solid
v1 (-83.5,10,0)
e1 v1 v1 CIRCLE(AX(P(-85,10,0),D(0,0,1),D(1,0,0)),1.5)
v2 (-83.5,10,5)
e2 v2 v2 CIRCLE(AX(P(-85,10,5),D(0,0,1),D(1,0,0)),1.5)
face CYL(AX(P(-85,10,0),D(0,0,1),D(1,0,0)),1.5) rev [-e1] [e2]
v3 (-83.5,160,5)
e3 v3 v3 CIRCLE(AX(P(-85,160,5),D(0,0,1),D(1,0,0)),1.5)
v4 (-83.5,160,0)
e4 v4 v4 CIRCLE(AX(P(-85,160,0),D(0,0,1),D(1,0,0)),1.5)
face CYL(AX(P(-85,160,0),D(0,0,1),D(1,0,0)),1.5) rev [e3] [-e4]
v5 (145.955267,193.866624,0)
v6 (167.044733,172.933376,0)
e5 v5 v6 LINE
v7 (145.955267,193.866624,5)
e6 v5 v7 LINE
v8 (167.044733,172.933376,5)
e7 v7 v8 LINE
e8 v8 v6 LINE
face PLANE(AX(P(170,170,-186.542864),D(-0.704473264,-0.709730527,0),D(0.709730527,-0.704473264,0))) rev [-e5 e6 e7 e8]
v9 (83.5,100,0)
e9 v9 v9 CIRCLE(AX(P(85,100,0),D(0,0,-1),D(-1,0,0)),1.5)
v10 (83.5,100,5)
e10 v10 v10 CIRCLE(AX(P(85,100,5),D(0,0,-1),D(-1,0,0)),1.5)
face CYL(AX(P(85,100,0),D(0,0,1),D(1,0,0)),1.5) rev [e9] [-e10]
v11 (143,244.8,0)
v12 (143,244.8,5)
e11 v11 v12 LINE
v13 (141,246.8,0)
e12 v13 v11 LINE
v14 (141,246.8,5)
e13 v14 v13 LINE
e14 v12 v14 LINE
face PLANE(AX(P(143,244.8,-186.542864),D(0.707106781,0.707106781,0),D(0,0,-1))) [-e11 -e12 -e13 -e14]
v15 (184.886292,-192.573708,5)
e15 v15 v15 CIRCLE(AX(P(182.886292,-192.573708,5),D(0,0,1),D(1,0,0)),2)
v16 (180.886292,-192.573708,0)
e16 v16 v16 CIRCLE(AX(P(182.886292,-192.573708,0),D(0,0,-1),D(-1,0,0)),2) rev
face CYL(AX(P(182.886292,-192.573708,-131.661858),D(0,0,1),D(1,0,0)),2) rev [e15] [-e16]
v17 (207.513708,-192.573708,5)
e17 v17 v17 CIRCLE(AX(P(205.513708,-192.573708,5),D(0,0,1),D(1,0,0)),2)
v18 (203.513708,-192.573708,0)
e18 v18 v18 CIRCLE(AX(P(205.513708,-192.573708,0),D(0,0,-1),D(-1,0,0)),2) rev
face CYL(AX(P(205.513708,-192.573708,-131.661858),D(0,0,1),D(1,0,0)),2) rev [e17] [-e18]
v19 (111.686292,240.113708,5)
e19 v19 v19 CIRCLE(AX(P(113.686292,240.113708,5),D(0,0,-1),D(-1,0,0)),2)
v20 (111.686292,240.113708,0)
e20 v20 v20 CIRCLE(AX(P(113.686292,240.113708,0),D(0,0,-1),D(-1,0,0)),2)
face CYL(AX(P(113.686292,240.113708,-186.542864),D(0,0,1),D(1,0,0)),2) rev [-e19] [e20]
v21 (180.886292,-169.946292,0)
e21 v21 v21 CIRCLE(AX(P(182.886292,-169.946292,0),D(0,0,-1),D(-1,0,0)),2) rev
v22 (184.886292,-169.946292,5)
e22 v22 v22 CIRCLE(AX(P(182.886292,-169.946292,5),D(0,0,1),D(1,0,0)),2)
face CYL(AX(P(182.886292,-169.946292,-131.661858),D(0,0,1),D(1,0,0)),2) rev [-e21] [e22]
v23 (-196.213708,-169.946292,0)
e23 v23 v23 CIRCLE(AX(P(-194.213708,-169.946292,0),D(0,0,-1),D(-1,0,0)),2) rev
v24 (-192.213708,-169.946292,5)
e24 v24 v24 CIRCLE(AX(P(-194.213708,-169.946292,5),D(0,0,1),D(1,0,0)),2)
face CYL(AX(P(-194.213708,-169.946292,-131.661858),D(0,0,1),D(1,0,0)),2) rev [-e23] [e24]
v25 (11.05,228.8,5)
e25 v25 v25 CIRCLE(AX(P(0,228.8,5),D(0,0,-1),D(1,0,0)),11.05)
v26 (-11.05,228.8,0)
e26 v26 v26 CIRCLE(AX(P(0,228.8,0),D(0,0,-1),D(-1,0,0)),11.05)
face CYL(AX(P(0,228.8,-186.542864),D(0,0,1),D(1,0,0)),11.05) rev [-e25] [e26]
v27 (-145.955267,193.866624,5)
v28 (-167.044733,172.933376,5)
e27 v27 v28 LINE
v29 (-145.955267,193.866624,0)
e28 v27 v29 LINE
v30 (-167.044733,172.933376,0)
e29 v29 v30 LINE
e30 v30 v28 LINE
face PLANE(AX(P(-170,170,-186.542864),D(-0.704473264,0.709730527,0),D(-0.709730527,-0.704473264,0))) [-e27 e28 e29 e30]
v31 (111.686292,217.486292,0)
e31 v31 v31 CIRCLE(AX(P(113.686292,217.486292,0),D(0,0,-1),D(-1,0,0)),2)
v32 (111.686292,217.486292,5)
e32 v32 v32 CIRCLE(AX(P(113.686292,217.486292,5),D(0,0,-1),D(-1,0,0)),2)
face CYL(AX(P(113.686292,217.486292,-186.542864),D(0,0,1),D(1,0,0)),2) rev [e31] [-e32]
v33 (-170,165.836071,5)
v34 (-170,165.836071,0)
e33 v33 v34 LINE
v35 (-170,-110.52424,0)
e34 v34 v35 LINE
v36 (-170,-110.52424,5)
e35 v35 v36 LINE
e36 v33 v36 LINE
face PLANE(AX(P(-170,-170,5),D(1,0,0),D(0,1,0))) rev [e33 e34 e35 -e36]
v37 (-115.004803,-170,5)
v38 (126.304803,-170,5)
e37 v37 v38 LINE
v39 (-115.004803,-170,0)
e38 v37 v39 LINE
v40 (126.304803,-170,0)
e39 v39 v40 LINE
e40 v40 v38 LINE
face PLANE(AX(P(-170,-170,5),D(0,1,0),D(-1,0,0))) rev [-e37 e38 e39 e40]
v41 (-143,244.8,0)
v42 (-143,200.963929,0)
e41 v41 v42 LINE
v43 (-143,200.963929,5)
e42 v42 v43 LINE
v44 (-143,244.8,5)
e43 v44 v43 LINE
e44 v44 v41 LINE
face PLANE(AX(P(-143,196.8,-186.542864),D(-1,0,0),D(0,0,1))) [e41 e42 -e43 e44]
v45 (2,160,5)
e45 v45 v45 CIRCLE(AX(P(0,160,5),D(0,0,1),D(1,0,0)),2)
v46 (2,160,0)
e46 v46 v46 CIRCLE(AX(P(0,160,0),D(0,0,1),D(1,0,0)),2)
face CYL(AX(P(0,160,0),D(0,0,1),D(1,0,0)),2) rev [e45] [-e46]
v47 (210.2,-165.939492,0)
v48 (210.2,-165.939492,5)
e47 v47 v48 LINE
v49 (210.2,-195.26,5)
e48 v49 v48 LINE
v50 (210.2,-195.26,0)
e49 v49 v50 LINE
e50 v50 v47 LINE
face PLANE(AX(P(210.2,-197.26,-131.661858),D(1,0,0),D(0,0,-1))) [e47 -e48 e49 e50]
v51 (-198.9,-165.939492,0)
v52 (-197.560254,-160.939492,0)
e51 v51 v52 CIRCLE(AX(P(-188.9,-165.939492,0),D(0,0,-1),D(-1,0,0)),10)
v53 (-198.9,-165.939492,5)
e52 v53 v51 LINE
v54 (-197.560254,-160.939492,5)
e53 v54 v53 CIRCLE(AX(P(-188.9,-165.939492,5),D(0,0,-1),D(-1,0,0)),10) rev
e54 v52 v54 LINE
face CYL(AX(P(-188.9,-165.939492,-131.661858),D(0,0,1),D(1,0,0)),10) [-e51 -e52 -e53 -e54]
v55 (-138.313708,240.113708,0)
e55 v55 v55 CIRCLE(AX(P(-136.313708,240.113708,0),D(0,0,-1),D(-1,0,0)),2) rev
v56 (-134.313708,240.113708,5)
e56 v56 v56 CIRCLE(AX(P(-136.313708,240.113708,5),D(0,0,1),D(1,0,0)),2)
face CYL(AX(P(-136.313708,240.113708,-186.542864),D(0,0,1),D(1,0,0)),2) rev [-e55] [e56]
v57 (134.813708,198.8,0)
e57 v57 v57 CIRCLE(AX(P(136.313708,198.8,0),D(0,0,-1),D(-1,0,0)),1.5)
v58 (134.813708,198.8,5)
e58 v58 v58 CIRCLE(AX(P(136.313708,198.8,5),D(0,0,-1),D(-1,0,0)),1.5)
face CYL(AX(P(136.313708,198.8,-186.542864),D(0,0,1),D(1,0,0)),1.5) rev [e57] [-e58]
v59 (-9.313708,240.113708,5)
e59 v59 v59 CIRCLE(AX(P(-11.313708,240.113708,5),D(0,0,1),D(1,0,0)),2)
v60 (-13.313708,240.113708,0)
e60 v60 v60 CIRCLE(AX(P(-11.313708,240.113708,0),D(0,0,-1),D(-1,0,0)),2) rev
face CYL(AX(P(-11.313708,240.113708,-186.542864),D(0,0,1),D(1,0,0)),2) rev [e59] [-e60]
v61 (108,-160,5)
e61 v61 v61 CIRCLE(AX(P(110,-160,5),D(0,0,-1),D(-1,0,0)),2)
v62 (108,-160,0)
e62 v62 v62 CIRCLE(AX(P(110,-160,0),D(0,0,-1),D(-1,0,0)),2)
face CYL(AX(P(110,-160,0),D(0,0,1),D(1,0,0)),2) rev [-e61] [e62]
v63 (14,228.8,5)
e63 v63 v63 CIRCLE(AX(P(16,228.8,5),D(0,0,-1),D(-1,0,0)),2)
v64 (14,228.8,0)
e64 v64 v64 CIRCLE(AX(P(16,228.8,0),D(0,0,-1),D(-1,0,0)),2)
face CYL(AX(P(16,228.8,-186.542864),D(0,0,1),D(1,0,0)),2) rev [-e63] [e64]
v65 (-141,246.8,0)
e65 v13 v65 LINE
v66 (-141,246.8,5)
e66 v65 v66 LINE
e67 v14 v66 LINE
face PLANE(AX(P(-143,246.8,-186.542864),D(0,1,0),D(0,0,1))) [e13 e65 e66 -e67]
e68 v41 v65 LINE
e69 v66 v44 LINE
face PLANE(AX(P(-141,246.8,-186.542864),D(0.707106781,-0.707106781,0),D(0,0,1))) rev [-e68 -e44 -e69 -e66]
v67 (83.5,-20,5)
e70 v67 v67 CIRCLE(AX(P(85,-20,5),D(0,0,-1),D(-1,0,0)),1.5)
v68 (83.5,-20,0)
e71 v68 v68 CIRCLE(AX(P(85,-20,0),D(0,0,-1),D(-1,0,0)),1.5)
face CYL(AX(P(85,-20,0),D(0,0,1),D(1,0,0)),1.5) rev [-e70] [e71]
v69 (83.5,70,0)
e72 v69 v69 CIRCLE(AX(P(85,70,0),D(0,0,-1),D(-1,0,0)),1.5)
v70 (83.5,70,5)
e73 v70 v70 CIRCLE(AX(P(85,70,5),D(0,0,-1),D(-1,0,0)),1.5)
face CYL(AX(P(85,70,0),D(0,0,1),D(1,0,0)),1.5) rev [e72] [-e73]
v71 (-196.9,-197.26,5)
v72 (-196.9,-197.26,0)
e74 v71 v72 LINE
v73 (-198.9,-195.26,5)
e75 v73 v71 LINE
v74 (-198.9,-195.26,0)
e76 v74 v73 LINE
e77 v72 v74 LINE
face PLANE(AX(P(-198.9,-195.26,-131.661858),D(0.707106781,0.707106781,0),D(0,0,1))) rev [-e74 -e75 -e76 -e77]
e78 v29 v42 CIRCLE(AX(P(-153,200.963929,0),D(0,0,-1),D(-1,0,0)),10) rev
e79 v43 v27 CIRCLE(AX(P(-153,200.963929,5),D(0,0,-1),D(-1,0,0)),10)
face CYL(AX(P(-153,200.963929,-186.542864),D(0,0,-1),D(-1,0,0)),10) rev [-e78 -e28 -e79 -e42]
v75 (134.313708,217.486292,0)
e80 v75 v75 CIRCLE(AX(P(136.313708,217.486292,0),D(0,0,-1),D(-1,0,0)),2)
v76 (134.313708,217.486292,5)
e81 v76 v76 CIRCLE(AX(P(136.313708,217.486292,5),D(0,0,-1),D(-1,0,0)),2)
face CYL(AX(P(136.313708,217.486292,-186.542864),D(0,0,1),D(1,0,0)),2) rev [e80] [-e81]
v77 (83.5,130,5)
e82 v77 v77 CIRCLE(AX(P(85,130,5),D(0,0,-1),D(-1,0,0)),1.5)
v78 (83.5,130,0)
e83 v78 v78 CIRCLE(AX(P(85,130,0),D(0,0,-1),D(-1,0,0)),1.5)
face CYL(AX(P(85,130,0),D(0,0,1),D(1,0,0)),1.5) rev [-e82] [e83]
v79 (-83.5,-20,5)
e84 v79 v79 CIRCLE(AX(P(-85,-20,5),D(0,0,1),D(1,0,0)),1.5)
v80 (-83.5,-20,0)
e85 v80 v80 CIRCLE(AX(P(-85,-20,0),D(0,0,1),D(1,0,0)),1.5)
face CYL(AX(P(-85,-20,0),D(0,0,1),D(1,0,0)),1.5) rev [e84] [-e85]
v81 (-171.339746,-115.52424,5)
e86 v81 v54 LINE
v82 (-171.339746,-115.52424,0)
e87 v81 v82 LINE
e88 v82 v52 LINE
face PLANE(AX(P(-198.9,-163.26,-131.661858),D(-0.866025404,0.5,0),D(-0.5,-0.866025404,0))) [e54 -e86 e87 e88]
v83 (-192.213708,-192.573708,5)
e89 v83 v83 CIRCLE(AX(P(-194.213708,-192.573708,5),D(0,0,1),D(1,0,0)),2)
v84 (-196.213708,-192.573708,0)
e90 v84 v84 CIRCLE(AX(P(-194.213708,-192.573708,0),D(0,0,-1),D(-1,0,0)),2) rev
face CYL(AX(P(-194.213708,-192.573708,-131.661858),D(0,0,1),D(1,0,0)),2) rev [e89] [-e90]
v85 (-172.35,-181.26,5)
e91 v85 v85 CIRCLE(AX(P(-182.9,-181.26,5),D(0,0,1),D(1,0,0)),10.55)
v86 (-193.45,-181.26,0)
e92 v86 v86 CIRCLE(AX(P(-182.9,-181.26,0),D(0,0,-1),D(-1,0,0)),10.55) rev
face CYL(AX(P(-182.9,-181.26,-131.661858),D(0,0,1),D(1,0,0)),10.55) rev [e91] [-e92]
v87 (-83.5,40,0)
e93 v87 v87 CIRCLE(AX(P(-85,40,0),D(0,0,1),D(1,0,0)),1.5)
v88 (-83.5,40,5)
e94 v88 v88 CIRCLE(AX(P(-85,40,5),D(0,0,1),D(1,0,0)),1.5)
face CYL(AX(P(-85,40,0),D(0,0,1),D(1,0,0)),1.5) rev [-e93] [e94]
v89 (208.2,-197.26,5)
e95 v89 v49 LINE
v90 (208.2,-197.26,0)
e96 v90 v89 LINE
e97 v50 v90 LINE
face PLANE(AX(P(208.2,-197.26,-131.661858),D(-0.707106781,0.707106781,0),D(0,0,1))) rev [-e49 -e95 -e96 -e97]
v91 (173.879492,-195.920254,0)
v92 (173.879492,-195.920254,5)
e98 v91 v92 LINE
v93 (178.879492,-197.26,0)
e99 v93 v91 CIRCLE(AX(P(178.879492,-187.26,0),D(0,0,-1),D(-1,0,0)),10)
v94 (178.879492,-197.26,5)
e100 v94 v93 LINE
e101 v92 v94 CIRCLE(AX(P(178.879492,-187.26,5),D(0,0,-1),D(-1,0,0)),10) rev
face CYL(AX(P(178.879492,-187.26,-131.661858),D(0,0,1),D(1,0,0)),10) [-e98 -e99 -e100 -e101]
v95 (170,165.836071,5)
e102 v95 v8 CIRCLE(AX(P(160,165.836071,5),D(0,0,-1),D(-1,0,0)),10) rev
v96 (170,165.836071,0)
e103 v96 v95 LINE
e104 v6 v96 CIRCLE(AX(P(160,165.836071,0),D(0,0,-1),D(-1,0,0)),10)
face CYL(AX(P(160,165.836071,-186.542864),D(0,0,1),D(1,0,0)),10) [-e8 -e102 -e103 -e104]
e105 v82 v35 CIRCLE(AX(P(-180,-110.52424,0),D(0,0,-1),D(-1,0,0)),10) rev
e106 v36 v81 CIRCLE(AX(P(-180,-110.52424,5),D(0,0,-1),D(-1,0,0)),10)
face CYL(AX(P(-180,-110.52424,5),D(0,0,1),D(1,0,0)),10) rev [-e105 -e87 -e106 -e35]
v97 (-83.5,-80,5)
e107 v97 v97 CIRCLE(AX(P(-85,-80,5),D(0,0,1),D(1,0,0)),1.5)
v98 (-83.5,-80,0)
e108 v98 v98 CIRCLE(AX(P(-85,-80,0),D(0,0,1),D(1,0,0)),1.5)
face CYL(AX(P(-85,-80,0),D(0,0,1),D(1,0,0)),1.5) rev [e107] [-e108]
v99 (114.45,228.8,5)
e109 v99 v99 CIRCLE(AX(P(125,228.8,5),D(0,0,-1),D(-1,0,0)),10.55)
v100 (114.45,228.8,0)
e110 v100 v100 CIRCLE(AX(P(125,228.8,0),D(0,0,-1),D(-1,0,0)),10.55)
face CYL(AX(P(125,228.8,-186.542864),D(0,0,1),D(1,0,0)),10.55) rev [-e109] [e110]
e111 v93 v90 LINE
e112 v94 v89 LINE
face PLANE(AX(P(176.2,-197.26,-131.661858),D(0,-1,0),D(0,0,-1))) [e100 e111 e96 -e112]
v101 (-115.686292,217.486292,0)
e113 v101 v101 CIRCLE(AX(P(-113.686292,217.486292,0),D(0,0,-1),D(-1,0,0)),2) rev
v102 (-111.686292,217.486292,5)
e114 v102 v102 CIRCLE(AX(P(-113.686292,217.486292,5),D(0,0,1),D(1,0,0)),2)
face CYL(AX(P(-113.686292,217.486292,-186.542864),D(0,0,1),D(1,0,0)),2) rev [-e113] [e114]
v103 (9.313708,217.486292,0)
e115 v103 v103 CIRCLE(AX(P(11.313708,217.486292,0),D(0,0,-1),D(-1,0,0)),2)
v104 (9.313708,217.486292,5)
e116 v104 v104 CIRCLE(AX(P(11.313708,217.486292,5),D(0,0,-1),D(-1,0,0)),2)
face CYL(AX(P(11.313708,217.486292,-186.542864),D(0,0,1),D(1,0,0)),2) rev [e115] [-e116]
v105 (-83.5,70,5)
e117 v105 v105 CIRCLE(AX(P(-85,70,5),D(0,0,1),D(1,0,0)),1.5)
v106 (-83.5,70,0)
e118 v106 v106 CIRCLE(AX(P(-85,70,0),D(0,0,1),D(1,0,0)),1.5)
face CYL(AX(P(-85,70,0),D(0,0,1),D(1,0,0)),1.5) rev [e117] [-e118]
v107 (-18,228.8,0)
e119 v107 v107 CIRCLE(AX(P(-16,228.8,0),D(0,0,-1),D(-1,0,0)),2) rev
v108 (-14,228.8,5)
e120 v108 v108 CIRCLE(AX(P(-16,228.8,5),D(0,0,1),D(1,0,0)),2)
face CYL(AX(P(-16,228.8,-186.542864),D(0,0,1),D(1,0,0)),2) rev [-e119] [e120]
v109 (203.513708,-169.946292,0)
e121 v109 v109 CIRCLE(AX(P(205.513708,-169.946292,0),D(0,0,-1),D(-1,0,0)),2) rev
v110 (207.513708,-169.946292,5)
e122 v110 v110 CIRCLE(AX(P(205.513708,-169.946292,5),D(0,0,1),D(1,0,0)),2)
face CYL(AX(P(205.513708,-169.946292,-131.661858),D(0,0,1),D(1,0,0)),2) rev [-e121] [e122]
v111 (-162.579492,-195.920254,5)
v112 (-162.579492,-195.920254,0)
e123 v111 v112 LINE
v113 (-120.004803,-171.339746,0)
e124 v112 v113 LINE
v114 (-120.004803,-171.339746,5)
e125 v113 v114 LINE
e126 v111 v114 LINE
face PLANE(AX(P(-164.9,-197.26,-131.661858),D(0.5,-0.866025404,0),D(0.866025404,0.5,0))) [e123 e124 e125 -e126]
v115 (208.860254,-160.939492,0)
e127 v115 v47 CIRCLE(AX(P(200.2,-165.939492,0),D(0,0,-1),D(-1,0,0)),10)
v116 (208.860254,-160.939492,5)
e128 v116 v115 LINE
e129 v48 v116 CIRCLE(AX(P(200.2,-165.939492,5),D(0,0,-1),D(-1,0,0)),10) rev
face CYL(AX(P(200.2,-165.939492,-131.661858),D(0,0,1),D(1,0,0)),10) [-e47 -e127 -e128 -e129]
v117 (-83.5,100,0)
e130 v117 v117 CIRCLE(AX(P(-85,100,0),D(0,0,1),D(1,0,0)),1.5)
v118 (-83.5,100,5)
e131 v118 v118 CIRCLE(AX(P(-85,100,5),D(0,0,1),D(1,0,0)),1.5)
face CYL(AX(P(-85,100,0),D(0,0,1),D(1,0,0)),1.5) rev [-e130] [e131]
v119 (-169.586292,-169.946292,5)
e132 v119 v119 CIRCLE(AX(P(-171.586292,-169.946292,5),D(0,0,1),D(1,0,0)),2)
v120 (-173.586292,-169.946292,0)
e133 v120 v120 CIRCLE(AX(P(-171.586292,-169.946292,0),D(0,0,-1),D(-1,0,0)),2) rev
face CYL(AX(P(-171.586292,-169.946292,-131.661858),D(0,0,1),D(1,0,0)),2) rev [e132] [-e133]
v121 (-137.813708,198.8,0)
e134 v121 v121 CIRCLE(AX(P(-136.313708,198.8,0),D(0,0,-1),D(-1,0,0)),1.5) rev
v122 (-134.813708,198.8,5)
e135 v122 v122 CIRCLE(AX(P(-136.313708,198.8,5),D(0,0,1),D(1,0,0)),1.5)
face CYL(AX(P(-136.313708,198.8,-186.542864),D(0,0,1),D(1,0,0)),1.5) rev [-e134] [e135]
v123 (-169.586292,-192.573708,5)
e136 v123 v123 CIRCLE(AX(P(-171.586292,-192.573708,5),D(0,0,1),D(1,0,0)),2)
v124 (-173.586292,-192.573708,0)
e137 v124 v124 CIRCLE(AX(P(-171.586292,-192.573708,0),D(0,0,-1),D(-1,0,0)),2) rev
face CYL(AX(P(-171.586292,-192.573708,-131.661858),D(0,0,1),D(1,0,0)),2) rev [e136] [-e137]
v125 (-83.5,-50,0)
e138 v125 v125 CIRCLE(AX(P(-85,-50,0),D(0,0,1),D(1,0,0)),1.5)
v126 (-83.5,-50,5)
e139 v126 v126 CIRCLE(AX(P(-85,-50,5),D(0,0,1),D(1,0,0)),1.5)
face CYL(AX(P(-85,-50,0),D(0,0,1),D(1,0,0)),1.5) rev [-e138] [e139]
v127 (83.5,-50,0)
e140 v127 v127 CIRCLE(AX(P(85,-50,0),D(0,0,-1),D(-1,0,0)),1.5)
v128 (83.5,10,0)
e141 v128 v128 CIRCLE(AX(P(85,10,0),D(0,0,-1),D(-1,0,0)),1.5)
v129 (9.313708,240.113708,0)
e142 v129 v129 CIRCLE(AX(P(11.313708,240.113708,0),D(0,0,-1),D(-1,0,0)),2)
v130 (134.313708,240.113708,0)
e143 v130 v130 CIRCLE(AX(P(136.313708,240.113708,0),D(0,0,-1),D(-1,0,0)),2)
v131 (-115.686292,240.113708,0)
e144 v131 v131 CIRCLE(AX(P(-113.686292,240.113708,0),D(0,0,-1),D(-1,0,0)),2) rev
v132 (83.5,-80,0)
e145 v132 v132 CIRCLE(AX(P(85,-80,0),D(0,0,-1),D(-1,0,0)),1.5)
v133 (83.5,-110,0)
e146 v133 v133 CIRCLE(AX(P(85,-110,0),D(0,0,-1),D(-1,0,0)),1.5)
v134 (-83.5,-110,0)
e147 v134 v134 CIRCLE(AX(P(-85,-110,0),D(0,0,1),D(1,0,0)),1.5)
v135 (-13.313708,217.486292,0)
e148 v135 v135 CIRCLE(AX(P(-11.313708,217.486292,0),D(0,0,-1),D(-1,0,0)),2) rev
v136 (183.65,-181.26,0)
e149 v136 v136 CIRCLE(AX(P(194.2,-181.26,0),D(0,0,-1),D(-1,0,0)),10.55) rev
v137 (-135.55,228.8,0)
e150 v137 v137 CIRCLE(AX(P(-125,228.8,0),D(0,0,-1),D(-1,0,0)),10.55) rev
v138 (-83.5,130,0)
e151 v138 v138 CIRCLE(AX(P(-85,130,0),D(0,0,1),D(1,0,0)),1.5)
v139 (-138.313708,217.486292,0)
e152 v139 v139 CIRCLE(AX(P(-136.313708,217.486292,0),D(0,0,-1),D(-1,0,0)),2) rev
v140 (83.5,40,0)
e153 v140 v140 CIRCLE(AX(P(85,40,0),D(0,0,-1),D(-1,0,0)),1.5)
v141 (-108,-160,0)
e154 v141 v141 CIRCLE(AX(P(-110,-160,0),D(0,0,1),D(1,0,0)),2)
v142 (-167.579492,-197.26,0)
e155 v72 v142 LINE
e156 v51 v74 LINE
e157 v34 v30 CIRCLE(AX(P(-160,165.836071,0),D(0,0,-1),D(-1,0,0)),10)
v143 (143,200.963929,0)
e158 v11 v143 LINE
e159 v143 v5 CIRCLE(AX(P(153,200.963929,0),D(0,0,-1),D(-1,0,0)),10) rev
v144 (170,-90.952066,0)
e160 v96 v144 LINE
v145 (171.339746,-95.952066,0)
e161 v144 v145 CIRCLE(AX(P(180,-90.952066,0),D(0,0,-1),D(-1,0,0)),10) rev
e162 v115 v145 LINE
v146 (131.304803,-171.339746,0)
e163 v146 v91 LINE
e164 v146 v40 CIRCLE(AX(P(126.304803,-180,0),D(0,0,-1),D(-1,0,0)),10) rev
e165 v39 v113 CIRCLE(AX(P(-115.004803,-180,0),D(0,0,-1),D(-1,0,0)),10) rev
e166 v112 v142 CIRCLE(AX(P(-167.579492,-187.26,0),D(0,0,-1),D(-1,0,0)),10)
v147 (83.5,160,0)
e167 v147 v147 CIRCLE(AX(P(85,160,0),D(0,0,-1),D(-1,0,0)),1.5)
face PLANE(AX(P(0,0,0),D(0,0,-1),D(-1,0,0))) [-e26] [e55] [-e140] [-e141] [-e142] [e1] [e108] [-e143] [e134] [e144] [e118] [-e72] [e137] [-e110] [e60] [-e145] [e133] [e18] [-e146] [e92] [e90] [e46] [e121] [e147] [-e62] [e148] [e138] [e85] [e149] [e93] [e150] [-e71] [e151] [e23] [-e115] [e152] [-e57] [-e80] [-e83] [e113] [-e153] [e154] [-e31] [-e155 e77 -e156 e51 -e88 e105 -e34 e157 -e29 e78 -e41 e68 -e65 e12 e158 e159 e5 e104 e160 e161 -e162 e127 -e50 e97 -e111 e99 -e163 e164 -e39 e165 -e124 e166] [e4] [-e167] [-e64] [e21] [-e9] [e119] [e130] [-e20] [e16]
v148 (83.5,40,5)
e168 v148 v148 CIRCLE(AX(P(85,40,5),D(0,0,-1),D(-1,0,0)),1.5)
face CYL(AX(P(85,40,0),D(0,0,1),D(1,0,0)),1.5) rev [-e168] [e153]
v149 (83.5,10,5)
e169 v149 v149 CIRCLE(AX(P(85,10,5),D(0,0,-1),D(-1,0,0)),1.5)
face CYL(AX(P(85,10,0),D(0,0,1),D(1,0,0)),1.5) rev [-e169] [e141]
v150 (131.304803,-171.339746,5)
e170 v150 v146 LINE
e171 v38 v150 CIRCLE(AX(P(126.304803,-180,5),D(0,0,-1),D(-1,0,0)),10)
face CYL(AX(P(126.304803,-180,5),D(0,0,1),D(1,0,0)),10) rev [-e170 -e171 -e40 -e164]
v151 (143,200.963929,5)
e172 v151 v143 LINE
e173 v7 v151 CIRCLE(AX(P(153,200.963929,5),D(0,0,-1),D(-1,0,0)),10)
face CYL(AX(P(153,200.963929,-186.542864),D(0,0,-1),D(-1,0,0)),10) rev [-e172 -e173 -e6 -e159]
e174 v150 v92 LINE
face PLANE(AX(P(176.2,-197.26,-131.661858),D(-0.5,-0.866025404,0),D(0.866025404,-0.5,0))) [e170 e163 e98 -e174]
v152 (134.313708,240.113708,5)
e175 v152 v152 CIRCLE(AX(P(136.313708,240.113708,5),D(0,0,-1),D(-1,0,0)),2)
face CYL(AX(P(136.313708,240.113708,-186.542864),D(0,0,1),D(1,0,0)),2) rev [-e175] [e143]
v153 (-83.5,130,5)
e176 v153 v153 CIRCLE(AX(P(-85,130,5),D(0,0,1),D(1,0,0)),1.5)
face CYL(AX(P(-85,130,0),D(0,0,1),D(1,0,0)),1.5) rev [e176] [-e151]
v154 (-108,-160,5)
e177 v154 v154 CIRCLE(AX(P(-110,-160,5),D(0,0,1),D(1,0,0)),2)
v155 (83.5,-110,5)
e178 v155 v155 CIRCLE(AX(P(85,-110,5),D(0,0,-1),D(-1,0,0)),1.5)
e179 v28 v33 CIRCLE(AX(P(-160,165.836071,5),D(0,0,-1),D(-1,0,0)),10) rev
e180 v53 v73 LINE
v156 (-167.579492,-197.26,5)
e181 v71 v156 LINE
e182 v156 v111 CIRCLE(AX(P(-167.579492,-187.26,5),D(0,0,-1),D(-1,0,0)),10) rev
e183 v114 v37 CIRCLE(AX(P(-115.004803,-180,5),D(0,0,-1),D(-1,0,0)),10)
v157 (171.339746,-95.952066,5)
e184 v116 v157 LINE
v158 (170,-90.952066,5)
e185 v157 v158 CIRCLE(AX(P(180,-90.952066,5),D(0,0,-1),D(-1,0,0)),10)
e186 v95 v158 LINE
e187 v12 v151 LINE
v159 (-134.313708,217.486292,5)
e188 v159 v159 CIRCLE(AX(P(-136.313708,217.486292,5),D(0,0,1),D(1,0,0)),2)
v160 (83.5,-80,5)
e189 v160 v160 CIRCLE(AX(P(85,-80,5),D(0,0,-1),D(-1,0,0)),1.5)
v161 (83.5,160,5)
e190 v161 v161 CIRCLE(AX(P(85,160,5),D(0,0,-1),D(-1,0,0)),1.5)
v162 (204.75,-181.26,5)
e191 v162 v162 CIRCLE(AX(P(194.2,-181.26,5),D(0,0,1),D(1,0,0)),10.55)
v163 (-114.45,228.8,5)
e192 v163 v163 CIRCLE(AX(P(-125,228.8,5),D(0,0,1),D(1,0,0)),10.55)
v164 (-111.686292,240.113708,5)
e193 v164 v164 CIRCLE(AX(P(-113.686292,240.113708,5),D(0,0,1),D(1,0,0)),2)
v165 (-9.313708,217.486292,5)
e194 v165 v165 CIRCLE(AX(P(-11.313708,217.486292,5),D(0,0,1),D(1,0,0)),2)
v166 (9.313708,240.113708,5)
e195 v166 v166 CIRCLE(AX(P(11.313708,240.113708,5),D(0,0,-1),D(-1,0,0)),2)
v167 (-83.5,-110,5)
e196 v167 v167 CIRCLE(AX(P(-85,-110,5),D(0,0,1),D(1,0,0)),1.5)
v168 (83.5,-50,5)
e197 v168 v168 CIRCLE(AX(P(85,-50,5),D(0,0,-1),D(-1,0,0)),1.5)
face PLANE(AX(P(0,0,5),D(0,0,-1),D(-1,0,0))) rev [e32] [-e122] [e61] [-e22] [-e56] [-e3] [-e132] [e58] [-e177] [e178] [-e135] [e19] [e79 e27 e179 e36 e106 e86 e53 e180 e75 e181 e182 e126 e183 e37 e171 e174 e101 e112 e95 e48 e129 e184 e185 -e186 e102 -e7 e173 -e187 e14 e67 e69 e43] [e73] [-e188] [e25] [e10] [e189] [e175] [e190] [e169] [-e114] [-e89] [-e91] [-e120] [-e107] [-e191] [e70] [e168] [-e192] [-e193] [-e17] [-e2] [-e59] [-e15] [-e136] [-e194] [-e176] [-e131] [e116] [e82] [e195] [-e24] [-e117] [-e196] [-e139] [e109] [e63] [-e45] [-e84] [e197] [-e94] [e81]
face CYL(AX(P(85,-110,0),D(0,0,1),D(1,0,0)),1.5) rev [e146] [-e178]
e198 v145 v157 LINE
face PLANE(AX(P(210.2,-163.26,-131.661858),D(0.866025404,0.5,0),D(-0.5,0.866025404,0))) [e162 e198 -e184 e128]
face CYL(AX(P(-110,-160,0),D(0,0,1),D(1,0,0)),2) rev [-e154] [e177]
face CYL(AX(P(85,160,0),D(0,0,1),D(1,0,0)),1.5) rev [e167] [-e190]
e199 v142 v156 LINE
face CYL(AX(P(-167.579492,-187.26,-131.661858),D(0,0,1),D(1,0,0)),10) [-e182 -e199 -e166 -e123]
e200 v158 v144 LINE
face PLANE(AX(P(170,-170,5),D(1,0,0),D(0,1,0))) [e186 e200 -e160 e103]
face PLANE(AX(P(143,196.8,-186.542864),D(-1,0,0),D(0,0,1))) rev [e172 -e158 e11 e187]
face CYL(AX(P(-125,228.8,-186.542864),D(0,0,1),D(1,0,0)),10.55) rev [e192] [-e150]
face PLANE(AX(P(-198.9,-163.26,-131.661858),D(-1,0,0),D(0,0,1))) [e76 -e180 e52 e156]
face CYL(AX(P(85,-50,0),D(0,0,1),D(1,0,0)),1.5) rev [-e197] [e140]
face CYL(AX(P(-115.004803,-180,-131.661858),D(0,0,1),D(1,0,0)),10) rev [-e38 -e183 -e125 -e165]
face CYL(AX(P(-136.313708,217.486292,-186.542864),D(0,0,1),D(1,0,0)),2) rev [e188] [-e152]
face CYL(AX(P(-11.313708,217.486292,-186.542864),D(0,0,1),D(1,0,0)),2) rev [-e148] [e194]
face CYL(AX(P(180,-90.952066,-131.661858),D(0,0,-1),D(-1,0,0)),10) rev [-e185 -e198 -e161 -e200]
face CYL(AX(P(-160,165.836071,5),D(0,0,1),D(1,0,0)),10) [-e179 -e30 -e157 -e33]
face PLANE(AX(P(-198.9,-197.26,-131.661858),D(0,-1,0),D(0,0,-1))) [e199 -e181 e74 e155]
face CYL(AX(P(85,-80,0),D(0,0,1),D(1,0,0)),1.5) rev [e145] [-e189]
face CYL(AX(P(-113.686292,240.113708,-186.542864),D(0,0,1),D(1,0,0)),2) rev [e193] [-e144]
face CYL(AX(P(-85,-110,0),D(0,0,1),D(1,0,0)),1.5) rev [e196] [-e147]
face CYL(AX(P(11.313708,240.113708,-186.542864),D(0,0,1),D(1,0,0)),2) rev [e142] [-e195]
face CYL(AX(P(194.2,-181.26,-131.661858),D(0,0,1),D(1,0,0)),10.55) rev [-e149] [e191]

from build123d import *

# Parameters (mm, degrees)
SKETCH1_W           = 170
SKETCH1_H           = 340
BOSS_EXTRUDE1_DEPTH = 5
SKETCH2_R           = 2
CUT_EXTRUDE1_DEPTH  = 241.468293128
SKETCH3_R           = 2
SKETCH3_R_2         = 10.55
SKETCH3_R_3         = 1.5
BOSS_EXTRUDE2_DEPTH = 5
CHAMFER3_SIZE       = 5
FILLET1_R           = 10
CHAMFER2_SIZE       = 2
MIRROR2_OUTLINE_R   = 2
MIRROR2_OUTLINE_R_2 = 1.5
MIRROR2_OUTLINE_R_3 = 10.55
MIRROR2_DEPTH       = 5
SKETCH5_R           = 10.55
SKETCH5_R_2         = 2
BOSS_EXTRUDE3_DEPTH = 5
CHAMFER4_SIZE       = 2
FILLET2_R           = 10
SKETCH4_R           = 1.5
CUT_EXTRUDE2_DEPTH  = 325.221035715


# Read off the part's stored shape, not the designer's step: Mirror2
with BuildPart() as part:
    # Sketch1 → Boss-Extrude1 (new body)
    with BuildSketch(Plane.XY):
        with Locations((-85, 0)):
            Rectangle(SKETCH1_W, SKETCH1_H)
    extrude(amount=BOSS_EXTRUDE1_DEPTH)

    # Sketch2 → Cut-Extrude1 (cut, through all)
    with BuildSketch(Plane.XY.offset(5)):
        with Locations((-110, -160)):
            Circle(SKETCH2_R)
        with Locations((0, 160)):
            Circle(SKETCH2_R)
    extrude(amount=-CUT_EXTRUDE1_DEPTH, mode=Mode.SUBTRACT)

    # Sketch3 → Boss-Extrude2 (add)
    with BuildSketch(Plane.XY.offset(5)):
        with BuildLine():
            Line((-170, 170), (-143, 196.8))
            Line((-143, 196.8), (-143, 246.8))
            Line((-143, 246.8), (0, 246.8))
            Line((0, 246.8), (0, 239.85))
            ThreePointArc((0, 239.85), (-11.05, 228.8), (0, 217.75))
            Line((0, 217.75), (0, 170))
            Line((0, 170), (-170, 170))
        make_face()
        with Locations((-11.313708499, 240.113708499)):
            Circle(SKETCH3_R, mode=Mode.SUBTRACT)
        with Locations((-11.313708499, 217.486291501)):
            Circle(SKETCH3_R, mode=Mode.SUBTRACT)
        with Locations((-16, 228.8)):
            Circle(SKETCH3_R, mode=Mode.SUBTRACT)
        with Locations((-125, 228.8)):
            Circle(SKETCH3_R_2, mode=Mode.SUBTRACT)
        with Locations((-136.313708499, 240.113708499)):
            Circle(SKETCH3_R, mode=Mode.SUBTRACT)
        with Locations((-113.686291501, 240.113708499)):
            Circle(SKETCH3_R, mode=Mode.SUBTRACT)
        with Locations((-136.313708499, 217.486291501)):
            Circle(SKETCH3_R, mode=Mode.SUBTRACT)
        with Locations((-113.686291501, 217.486291501)):
            Circle(SKETCH3_R, mode=Mode.SUBTRACT)
        with Locations((-136.313708499, 198.8)):
            Circle(SKETCH3_R_3, mode=Mode.SUBTRACT)
    extrude(amount=-BOSS_EXTRUDE2_DEPTH)

    # Chamfer3
    chamfer3_edges = [part.edges().sort_by_distance(p)[0] for p in [
        (-170, -170, 2.5),
    ]]
    chamfer(chamfer3_edges, length=CHAMFER3_SIZE)

    # Fillet1
    fillet1_edges = [part.edges().sort_by_distance(p)[0] for p in [
        (-143, 196.8, 2.5),
        (-170, 170, 2.5),
    ]]
    fillet(fillet1_edges, radius=FILLET1_R)

    # Chamfer2
    chamfer2_edges = [part.edges().sort_by_distance(p)[0] for p in [
        (-143, 246.8, 2.5),
    ]]
    chamfer(chamfer2_edges, length=CHAMFER2_SIZE)

    # Mirror2 outline → Mirror2 (add)
    with BuildSketch(Plane.XY):
        with BuildLine():
            Line((0, -170), (165, -170))
            Line((165, -170), (170, -165))
            Line((170, -165), (170, 165.836071225))
            ThreePointArc((170, 165.836071225), (169.231666328, 169.680071331), (167.044732637, 172.933376494))
            Line((167.044732637, 172.933376494), (145.955267363, 193.866623506))
            ThreePointArc((145.955267363, 193.866623506), (143.768333672, 197.119928669), (143, 200.963928775))
            Line((143, 200.963928775), (143, 244.8))
            Line((143, 244.8), (141, 246.8))
            Line((141, 246.8), (0, 246.8))
            Line((0, 246.8), (0, 239.85))
            ThreePointArc((0, 239.85), (11.05, 228.8), (0, 217.75))
            Line((0, 217.75), (0, 162))
            ThreePointArc((0, 162), (2, 160), (0, 158))
            Line((0, 158), (0, -170))
        make_face()
        with Locations((110, -160)):
            Circle(MIRROR2_OUTLINE_R, mode=Mode.SUBTRACT)
        with Locations((11.313708499, 217.486291501)):
            Circle(MIRROR2_OUTLINE_R, mode=Mode.SUBTRACT)
        with Locations((11.313708499, 240.113708499)):
            Circle(MIRROR2_OUTLINE_R, mode=Mode.SUBTRACT)
        with Locations((16, 228.8)):
            Circle(MIRROR2_OUTLINE_R, mode=Mode.SUBTRACT)
        with Locations((113.686291501, 217.486291501)):
            Circle(MIRROR2_OUTLINE_R, mode=Mode.SUBTRACT)
        with Locations((113.686291501, 240.113708499)):
            Circle(MIRROR2_OUTLINE_R, mode=Mode.SUBTRACT)
        with Locations((136.313708499, 198.8)):
            Circle(MIRROR2_OUTLINE_R_2, mode=Mode.SUBTRACT)
        with Locations((136.313708499, 217.486291501)):
            Circle(MIRROR2_OUTLINE_R, mode=Mode.SUBTRACT)
        with Locations((125, 228.8)):
            Circle(MIRROR2_OUTLINE_R_3, mode=Mode.SUBTRACT)
        with Locations((136.313708499, 240.113708499)):
            Circle(MIRROR2_OUTLINE_R, mode=Mode.SUBTRACT)
    extrude(amount=MIRROR2_DEPTH)

    # Sketch5 → Boss-Extrude3 (add)
    # profile 1 of 2: a face of its own
    with BuildSketch(Plane.XY.offset(5)):
        Polygon((-198.9, -163.26), (-198.9, -197.26), (-164.9, -197.26), (-117.684294986, -170), (-170, -113.203731661), align=None)
        with Locations((-182.9, -181.26)):
            Circle(SKETCH5_R, mode=Mode.SUBTRACT)
        with Locations((-194.213708499, -169.946291501)):
            Circle(SKETCH5_R_2, mode=Mode.SUBTRACT)
        with Locations((-171.586291501, -169.946291501)):
            Circle(SKETCH5_R_2, mode=Mode.SUBTRACT)
        with Locations((-171.586291501, -192.573708499)):
            Circle(SKETCH5_R_2, mode=Mode.SUBTRACT)
        with Locations((-194.213708499, -192.573708499)):
            Circle(SKETCH5_R_2, mode=Mode.SUBTRACT)
    # profile 2 of 2: a face of its own
    with BuildSketch(Plane.XY.offset(5)):
        Polygon((176.2, -197.26), (210.2, -197.26), (210.2, -163.26), (170, -93.631557536), (128.984294986, -170), align=None)
        with Locations((194.2, -181.26)):
            Circle(SKETCH5_R, mode=Mode.SUBTRACT)
        with Locations((205.513708499, -192.573708499)):
            Circle(SKETCH5_R_2, mode=Mode.SUBTRACT)
        with Locations((205.513708499, -169.946291501)):
            Circle(SKETCH5_R_2, mode=Mode.SUBTRACT)
        with Locations((182.886291501, -169.946291501)):
            Circle(SKETCH5_R_2, mode=Mode.SUBTRACT)
        with Locations((182.886291501, -192.573708499)):
            Circle(SKETCH5_R_2, mode=Mode.SUBTRACT)
    extrude(amount=-BOSS_EXTRUDE3_DEPTH)

    # Chamfer4
    chamfer4_edges = [part.edges().sort_by_distance(p)[0] for p in [
        (-198.9, -197.26, 2.5),
        (210.2, -197.26, 2.5),
    ]]
    chamfer(chamfer4_edges, length=CHAMFER4_SIZE)

    # Fillet2
    fillet2_edges = [part.edges().sort_by_distance(p)[0] for p in [
        (-198.9, -163.26, 2.5),
        (-170, -113.203731661, 2.5),
        (-117.684294986, -170, 2.5),
        (-164.9, -197.26, 2.5),
        (176.2, -197.26, 2.5),
        (128.984294986, -170, 2.5),
        (170, -93.631557536, 2.5),
        (210.2, -163.26, 2.5),
    ]]
    fillet(fillet2_edges, radius=FILLET2_R)

    # Sketch4 → Cut-Extrude2 (cut, through all)
    with BuildSketch(Plane.XY.offset(5)):
        with Locations((-85, 160)):
            Circle(SKETCH4_R)
        with Locations((-85, 130)):
            Circle(SKETCH4_R)
        with Locations((-85, 100)):
            Circle(SKETCH4_R)
        with Locations((-85, 70)):
            Circle(SKETCH4_R)
        with Locations((-85, 40)):
            Circle(SKETCH4_R)
        with Locations((-85, 10)):
            Circle(SKETCH4_R)
        with Locations((-85, -20)):
            Circle(SKETCH4_R)
        with Locations((-85, -50)):
            Circle(SKETCH4_R)
        with Locations((-85, -80)):
            Circle(SKETCH4_R)
        with Locations((-85, -110)):
            Circle(SKETCH4_R)
    cut_extrude2 = extrude(amount=-CUT_EXTRUDE2_DEPTH, mode=Mode.SUBTRACT)

    # Mirror3: Cut-Extrude2 across plane
    add(cut_extrude2.mirror(Plane(origin=(0, 0, 0), x_dir=(0, 0, 1), z_dir=(1, 0, 0))), mode=Mode.SUBTRACT)


solid = part.part
